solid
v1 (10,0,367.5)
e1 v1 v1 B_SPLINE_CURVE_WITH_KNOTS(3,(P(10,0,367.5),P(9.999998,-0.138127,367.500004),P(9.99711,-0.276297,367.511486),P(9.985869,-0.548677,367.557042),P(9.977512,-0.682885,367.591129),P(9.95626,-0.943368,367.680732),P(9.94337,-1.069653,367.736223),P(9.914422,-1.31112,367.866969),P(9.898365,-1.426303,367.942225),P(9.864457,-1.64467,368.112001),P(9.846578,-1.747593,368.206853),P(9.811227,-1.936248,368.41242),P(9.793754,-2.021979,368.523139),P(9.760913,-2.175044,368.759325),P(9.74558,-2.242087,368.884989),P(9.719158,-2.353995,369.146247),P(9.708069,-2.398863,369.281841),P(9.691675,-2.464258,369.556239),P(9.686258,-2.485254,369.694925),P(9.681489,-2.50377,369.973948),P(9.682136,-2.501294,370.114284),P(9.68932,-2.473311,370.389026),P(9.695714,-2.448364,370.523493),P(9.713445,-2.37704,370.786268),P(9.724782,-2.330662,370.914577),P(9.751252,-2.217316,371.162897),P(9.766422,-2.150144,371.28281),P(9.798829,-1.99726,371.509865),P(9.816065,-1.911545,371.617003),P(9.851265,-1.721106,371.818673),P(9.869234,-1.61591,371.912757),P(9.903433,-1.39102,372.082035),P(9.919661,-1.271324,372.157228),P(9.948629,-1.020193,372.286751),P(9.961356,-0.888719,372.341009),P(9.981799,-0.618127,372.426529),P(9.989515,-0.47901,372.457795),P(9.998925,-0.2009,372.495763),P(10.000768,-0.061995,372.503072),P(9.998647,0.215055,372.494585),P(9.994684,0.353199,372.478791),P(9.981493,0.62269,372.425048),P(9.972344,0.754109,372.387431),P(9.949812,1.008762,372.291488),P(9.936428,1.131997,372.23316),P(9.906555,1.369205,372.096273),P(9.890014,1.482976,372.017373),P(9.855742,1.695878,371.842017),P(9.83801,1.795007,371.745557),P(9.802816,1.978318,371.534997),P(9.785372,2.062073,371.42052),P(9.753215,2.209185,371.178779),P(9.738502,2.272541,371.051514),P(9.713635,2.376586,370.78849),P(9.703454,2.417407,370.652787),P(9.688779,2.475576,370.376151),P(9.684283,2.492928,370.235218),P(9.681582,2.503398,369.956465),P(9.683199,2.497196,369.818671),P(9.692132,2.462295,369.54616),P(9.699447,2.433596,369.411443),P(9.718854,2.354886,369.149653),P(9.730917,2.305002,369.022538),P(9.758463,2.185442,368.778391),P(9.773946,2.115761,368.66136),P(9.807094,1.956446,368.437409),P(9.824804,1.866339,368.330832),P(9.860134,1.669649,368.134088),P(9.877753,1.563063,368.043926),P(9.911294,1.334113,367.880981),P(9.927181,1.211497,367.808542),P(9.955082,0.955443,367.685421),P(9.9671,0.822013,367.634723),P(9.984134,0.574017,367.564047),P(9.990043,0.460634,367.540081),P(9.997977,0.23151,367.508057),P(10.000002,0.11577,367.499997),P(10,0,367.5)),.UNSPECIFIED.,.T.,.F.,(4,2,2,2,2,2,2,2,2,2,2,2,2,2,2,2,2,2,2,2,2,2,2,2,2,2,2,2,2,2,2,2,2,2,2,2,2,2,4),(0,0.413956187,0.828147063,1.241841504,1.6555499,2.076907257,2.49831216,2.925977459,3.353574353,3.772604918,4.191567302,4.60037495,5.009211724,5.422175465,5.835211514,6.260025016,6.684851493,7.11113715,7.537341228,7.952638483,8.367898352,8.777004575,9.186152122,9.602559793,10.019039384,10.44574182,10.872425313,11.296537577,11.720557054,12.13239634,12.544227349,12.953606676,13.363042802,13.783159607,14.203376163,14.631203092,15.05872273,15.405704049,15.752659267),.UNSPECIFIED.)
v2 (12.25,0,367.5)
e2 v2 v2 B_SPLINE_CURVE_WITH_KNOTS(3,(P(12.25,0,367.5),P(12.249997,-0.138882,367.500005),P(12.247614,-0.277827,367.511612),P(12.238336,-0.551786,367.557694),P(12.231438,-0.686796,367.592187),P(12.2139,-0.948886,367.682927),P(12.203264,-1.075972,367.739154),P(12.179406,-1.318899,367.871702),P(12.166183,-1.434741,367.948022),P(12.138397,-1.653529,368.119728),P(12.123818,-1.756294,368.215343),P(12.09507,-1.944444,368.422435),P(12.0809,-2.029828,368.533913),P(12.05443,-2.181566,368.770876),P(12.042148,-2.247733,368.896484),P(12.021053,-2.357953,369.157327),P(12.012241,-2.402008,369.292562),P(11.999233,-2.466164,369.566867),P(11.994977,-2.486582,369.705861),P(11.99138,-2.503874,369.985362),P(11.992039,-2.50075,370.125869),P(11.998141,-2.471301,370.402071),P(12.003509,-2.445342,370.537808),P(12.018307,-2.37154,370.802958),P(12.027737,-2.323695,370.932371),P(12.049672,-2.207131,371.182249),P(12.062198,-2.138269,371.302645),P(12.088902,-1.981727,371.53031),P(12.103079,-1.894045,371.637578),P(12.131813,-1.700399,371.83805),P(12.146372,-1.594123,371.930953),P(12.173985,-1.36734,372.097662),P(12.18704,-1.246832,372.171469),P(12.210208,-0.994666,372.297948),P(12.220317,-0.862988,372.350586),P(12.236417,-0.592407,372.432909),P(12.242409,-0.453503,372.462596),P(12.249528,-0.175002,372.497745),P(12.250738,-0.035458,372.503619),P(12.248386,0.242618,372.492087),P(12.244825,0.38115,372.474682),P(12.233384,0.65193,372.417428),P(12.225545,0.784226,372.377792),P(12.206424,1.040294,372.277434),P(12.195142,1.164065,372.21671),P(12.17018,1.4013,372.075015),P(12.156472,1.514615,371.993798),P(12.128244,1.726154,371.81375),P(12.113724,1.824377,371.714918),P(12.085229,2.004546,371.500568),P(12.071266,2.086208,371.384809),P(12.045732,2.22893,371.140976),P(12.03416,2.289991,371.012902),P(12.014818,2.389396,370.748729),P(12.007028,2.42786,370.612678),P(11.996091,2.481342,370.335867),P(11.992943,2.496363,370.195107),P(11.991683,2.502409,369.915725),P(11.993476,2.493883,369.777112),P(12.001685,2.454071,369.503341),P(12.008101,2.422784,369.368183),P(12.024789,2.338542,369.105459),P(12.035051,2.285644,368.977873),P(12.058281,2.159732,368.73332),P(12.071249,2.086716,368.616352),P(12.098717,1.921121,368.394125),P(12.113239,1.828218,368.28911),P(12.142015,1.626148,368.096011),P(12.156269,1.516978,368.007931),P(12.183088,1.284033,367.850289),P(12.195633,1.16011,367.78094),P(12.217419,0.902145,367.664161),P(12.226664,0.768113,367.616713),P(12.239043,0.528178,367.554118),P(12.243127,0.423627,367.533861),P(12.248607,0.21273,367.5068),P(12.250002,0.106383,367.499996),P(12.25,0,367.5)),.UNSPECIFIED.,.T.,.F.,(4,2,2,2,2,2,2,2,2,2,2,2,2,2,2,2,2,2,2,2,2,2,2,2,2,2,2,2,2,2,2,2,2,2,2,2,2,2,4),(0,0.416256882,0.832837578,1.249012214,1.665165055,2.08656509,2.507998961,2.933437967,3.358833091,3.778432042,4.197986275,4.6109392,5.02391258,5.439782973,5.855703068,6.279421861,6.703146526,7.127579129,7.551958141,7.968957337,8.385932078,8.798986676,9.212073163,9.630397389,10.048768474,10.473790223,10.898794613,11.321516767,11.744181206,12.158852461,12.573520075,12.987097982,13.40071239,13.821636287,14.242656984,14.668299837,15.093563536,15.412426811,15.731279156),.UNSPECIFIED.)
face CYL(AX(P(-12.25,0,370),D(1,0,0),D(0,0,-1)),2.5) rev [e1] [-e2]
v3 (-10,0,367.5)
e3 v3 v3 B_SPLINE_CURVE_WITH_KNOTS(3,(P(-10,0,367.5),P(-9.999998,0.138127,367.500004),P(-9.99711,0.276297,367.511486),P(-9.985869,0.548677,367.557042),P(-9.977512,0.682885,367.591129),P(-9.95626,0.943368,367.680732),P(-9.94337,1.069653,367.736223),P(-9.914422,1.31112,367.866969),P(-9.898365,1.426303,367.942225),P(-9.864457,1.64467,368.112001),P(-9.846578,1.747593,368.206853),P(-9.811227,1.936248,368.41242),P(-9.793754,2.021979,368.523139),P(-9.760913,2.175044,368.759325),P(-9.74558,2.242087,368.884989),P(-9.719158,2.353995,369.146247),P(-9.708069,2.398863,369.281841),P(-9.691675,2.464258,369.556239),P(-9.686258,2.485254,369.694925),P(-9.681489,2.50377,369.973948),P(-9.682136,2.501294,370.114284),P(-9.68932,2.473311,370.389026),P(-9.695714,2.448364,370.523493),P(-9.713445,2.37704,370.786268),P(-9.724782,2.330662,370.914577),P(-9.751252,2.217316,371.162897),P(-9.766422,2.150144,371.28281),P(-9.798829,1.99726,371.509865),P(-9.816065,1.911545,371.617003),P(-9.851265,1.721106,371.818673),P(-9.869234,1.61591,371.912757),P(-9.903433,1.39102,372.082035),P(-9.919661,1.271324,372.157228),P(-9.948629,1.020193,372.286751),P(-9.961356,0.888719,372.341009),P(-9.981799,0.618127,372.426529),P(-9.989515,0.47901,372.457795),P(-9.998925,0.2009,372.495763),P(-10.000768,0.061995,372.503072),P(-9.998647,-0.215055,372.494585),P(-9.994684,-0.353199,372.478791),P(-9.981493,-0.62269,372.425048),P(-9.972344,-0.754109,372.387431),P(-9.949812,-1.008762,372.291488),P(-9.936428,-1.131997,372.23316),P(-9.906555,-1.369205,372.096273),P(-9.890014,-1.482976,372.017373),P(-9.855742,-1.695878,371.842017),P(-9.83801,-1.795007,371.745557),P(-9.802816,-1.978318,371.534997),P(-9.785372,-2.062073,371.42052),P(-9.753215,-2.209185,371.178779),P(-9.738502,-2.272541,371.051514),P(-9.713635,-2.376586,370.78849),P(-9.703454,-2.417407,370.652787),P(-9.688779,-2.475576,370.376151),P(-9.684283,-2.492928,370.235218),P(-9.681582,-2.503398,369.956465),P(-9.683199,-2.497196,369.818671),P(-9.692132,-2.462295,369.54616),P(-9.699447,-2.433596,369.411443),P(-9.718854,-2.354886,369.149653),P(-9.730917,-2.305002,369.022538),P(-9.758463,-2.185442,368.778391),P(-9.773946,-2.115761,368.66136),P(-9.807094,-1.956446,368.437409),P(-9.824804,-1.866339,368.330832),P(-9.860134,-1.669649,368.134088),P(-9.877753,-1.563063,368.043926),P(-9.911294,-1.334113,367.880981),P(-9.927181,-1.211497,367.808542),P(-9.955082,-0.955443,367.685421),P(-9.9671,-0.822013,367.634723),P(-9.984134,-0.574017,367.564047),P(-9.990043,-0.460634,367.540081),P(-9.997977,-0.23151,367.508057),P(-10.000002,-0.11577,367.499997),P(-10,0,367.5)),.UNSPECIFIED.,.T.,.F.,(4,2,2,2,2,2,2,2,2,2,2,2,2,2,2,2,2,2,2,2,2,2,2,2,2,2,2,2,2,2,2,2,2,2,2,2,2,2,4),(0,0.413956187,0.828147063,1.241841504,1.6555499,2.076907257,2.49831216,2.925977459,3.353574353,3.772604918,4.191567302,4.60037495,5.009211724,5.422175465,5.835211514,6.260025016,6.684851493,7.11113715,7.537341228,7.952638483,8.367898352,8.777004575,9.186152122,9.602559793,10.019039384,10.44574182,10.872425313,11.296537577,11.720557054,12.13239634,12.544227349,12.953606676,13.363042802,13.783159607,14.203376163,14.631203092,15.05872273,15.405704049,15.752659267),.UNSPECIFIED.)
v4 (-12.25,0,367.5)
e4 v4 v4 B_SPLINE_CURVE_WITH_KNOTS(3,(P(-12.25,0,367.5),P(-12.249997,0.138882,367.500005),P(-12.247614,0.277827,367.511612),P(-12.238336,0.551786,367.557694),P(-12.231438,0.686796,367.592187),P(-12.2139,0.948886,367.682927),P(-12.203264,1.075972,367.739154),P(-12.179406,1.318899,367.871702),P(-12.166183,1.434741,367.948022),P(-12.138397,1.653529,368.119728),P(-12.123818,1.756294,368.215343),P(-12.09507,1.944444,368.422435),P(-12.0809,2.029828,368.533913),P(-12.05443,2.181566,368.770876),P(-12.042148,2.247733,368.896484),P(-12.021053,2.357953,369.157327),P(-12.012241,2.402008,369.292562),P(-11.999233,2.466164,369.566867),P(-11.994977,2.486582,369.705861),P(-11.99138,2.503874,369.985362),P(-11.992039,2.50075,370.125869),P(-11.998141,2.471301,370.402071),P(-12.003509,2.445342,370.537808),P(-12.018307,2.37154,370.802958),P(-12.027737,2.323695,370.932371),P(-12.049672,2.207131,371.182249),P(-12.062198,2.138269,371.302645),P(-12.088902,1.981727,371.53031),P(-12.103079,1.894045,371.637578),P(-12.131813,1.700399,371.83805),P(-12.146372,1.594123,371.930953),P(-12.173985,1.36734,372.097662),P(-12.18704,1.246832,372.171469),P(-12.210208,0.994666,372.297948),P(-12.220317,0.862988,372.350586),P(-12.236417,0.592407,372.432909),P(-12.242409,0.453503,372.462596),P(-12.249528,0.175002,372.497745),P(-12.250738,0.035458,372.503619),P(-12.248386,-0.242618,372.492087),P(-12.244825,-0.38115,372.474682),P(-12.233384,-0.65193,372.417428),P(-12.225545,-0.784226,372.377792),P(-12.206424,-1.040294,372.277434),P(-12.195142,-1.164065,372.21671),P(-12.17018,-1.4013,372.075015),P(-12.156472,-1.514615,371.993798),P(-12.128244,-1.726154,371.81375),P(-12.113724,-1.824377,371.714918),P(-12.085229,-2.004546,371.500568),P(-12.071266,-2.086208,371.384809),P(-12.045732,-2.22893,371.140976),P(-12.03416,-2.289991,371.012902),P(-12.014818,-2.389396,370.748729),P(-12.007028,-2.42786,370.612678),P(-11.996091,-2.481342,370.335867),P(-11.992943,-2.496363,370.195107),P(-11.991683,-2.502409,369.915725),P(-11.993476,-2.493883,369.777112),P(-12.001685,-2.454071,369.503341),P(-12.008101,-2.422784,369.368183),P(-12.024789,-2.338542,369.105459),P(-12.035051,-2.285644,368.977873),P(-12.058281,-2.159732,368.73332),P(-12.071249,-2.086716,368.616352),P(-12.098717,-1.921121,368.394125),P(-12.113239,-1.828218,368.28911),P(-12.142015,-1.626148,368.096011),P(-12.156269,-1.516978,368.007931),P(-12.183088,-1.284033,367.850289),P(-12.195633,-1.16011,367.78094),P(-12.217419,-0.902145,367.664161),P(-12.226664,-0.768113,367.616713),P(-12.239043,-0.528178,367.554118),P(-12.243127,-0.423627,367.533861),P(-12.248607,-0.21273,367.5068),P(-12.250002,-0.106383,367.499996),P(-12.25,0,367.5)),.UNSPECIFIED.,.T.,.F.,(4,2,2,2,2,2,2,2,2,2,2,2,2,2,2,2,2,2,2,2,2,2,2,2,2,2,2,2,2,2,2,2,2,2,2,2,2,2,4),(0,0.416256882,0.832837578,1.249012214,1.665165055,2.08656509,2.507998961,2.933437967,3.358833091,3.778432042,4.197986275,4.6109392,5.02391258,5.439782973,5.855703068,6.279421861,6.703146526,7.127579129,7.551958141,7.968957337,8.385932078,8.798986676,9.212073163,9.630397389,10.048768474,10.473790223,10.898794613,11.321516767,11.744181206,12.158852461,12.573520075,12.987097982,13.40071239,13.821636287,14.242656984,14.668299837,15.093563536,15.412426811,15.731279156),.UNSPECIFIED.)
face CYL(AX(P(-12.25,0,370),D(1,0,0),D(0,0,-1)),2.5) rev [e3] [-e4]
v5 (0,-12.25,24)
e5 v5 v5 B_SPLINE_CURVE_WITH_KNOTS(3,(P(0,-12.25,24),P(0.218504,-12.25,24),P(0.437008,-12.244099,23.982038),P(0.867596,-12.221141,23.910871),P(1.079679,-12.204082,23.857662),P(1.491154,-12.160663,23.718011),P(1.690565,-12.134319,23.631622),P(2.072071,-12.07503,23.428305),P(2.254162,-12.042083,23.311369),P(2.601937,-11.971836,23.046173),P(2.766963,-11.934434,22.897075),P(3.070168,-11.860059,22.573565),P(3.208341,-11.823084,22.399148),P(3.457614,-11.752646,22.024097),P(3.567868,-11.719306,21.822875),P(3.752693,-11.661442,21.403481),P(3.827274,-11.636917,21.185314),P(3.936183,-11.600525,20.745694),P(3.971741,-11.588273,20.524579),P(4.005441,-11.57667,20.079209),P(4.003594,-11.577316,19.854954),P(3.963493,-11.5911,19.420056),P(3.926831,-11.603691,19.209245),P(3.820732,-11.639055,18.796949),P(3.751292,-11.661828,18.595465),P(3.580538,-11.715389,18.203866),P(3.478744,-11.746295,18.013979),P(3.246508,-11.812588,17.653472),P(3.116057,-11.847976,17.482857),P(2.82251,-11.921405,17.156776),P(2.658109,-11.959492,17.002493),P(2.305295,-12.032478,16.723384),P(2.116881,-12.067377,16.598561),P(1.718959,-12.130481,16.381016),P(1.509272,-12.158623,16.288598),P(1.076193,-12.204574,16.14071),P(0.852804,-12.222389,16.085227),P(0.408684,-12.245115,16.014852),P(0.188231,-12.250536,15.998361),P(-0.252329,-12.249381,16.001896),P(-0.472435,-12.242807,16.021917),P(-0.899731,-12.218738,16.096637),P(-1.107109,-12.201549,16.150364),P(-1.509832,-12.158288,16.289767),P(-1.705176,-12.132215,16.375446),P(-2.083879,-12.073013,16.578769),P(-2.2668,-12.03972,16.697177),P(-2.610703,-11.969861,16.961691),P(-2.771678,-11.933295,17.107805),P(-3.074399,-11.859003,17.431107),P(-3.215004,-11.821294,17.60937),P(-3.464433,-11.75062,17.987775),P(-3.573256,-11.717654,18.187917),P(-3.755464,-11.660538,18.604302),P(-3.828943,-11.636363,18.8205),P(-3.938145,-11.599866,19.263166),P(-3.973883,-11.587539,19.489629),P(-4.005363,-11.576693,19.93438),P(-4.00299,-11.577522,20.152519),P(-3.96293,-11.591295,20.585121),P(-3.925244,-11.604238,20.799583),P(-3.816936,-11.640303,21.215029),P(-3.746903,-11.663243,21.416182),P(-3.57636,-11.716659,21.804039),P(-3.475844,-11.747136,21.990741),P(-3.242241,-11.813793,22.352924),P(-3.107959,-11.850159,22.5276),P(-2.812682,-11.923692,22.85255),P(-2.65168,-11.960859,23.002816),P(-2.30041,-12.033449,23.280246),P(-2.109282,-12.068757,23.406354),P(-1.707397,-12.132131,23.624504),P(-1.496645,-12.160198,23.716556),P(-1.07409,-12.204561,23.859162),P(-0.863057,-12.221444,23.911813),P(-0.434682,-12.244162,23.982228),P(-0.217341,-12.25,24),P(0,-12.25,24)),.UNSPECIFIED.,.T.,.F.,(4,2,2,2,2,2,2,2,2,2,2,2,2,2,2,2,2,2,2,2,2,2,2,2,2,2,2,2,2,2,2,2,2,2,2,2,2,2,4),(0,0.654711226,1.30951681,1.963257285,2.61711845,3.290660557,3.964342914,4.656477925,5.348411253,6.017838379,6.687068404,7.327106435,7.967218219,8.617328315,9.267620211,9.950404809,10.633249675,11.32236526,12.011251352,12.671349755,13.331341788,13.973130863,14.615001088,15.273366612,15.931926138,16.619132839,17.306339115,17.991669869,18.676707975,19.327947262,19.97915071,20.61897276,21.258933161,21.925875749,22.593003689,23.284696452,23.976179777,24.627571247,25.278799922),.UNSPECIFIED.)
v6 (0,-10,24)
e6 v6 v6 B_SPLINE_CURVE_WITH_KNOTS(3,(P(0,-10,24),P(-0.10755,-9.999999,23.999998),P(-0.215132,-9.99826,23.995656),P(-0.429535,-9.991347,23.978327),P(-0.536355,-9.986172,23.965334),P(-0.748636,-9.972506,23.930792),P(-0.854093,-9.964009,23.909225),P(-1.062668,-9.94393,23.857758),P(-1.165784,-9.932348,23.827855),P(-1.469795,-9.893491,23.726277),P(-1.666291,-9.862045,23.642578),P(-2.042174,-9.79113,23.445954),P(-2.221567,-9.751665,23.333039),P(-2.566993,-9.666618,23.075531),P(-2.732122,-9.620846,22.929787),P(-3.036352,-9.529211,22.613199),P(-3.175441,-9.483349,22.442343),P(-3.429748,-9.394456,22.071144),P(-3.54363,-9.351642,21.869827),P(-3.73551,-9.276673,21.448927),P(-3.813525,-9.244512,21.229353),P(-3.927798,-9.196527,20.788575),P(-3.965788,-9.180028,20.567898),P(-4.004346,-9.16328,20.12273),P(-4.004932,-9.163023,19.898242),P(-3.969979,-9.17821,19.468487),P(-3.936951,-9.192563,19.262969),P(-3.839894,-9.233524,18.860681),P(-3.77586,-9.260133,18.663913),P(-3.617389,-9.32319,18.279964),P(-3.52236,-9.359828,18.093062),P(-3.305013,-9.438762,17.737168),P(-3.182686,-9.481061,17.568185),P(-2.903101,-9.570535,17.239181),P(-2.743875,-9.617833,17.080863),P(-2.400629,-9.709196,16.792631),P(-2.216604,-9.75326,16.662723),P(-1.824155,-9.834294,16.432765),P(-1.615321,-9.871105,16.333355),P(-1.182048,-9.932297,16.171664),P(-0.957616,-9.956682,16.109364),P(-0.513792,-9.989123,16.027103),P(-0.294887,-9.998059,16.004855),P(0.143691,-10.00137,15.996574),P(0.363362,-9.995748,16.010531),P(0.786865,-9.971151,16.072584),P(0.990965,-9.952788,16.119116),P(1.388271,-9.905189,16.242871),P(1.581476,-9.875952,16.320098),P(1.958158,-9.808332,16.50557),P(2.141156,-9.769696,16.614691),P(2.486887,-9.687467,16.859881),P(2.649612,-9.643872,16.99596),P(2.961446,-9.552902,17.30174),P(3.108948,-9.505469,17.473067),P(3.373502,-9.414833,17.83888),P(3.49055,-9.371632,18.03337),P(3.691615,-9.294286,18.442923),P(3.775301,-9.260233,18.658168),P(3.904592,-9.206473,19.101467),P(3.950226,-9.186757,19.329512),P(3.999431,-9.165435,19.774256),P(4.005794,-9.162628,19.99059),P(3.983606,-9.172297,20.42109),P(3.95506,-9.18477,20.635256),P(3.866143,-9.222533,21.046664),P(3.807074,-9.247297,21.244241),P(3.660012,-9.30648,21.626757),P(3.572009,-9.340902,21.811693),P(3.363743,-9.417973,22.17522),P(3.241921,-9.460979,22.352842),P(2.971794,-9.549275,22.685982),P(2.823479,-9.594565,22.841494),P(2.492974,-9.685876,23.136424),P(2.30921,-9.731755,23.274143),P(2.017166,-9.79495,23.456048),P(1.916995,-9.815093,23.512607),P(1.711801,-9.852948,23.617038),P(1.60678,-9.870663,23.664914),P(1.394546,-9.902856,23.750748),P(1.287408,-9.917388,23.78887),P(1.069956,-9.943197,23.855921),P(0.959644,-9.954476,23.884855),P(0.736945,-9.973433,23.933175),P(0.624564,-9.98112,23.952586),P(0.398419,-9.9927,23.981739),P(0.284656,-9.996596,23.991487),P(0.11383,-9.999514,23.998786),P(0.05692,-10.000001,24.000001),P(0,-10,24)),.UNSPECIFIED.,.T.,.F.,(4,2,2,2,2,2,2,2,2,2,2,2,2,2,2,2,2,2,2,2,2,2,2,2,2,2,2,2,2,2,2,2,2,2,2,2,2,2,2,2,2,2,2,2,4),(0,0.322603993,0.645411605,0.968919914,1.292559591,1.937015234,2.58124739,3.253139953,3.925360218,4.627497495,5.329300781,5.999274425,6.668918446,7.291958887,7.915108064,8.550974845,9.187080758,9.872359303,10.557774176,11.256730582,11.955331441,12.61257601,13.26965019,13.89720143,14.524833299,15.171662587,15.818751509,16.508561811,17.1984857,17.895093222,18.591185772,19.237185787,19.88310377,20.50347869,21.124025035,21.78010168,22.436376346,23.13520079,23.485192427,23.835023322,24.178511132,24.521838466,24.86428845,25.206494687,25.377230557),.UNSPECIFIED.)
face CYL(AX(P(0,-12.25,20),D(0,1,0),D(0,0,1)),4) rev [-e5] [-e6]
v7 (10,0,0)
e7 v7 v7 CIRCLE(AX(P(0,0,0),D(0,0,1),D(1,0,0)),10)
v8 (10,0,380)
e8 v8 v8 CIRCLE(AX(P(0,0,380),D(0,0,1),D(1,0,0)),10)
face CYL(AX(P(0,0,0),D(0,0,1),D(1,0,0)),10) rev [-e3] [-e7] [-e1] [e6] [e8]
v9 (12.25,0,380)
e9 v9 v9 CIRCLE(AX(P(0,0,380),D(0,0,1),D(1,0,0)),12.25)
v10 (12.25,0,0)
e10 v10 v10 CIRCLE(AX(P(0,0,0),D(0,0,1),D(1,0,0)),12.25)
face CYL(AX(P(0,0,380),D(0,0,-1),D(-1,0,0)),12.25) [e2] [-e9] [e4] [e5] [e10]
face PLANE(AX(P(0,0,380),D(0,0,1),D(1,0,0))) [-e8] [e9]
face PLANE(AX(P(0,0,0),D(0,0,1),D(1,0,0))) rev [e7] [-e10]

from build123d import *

# Parameters (mm, degrees)
SKETCH1_R               = 12.25
BOSS_EXTRUDE1_DEPTH     = 380
CUT_EXTRUDE1_DEPTH      = 381.394696335
CUT_EXTRUDE1_DEPTH_BACK = 381.394696335
SKETCH2_R               = 2.5
CUT_EXTRUDE2_DEPTH      = 381.394696442
CUT_EXTRUDE2_DEPTH_BACK = 381.394696442
SKETCH3_R               = 10
CUT_EXTRUDE3_START      = -12.2500001
CUT_EXTRUDE3_OUTLINE_R  = 4
CUT_EXTRUDE3_DEPTH      = 3.08483721


# Read off the part's stored shape, not the designer's step: Cut-Extrude3
with BuildPart() as part:
    # Sketch1 → Boss-Extrude1 (new body)
    with BuildSketch(Plane.XY):
        Circle(SKETCH1_R)
    extrude(amount=BOSS_EXTRUDE1_DEPTH)

    # Sketch2 → Cut-Extrude1 (cut, two sides: drawn at the far end of the back side and taken through both)
    with BuildSketch(Plane(origin=(0, 0, 0), x_dir=(0, 0, -1), z_dir=(1, 0, 0)).offset(-CUT_EXTRUDE1_DEPTH_BACK)):
        with Locations((-370, 0)):
            Circle(SKETCH2_R)
    extrude(amount=CUT_EXTRUDE1_DEPTH + CUT_EXTRUDE1_DEPTH_BACK, mode=Mode.SUBTRACT)

    # Sketch3 → Cut-Extrude2 (cut, two sides: drawn at the far end of the back side and taken through both)
    with BuildSketch(Plane.XY.offset(380).offset(-CUT_EXTRUDE2_DEPTH_BACK)):
        Circle(SKETCH3_R)
    extrude(amount=CUT_EXTRUDE2_DEPTH + CUT_EXTRUDE2_DEPTH_BACK, mode=Mode.SUBTRACT)

    # Cut-Extrude3 outline → Cut-Extrude3 (cut)
    with BuildSketch(Plane(origin=(0, 0, 0), x_dir=(1, 0, 0), z_dir=(0, 1, 0)).offset(CUT_EXTRUDE3_START)):
        with Locations((0, -20)):
            Circle(CUT_EXTRUDE3_OUTLINE_R)
    extrude(amount=CUT_EXTRUDE3_DEPTH, mode=Mode.SUBTRACT)


solid = part.part
